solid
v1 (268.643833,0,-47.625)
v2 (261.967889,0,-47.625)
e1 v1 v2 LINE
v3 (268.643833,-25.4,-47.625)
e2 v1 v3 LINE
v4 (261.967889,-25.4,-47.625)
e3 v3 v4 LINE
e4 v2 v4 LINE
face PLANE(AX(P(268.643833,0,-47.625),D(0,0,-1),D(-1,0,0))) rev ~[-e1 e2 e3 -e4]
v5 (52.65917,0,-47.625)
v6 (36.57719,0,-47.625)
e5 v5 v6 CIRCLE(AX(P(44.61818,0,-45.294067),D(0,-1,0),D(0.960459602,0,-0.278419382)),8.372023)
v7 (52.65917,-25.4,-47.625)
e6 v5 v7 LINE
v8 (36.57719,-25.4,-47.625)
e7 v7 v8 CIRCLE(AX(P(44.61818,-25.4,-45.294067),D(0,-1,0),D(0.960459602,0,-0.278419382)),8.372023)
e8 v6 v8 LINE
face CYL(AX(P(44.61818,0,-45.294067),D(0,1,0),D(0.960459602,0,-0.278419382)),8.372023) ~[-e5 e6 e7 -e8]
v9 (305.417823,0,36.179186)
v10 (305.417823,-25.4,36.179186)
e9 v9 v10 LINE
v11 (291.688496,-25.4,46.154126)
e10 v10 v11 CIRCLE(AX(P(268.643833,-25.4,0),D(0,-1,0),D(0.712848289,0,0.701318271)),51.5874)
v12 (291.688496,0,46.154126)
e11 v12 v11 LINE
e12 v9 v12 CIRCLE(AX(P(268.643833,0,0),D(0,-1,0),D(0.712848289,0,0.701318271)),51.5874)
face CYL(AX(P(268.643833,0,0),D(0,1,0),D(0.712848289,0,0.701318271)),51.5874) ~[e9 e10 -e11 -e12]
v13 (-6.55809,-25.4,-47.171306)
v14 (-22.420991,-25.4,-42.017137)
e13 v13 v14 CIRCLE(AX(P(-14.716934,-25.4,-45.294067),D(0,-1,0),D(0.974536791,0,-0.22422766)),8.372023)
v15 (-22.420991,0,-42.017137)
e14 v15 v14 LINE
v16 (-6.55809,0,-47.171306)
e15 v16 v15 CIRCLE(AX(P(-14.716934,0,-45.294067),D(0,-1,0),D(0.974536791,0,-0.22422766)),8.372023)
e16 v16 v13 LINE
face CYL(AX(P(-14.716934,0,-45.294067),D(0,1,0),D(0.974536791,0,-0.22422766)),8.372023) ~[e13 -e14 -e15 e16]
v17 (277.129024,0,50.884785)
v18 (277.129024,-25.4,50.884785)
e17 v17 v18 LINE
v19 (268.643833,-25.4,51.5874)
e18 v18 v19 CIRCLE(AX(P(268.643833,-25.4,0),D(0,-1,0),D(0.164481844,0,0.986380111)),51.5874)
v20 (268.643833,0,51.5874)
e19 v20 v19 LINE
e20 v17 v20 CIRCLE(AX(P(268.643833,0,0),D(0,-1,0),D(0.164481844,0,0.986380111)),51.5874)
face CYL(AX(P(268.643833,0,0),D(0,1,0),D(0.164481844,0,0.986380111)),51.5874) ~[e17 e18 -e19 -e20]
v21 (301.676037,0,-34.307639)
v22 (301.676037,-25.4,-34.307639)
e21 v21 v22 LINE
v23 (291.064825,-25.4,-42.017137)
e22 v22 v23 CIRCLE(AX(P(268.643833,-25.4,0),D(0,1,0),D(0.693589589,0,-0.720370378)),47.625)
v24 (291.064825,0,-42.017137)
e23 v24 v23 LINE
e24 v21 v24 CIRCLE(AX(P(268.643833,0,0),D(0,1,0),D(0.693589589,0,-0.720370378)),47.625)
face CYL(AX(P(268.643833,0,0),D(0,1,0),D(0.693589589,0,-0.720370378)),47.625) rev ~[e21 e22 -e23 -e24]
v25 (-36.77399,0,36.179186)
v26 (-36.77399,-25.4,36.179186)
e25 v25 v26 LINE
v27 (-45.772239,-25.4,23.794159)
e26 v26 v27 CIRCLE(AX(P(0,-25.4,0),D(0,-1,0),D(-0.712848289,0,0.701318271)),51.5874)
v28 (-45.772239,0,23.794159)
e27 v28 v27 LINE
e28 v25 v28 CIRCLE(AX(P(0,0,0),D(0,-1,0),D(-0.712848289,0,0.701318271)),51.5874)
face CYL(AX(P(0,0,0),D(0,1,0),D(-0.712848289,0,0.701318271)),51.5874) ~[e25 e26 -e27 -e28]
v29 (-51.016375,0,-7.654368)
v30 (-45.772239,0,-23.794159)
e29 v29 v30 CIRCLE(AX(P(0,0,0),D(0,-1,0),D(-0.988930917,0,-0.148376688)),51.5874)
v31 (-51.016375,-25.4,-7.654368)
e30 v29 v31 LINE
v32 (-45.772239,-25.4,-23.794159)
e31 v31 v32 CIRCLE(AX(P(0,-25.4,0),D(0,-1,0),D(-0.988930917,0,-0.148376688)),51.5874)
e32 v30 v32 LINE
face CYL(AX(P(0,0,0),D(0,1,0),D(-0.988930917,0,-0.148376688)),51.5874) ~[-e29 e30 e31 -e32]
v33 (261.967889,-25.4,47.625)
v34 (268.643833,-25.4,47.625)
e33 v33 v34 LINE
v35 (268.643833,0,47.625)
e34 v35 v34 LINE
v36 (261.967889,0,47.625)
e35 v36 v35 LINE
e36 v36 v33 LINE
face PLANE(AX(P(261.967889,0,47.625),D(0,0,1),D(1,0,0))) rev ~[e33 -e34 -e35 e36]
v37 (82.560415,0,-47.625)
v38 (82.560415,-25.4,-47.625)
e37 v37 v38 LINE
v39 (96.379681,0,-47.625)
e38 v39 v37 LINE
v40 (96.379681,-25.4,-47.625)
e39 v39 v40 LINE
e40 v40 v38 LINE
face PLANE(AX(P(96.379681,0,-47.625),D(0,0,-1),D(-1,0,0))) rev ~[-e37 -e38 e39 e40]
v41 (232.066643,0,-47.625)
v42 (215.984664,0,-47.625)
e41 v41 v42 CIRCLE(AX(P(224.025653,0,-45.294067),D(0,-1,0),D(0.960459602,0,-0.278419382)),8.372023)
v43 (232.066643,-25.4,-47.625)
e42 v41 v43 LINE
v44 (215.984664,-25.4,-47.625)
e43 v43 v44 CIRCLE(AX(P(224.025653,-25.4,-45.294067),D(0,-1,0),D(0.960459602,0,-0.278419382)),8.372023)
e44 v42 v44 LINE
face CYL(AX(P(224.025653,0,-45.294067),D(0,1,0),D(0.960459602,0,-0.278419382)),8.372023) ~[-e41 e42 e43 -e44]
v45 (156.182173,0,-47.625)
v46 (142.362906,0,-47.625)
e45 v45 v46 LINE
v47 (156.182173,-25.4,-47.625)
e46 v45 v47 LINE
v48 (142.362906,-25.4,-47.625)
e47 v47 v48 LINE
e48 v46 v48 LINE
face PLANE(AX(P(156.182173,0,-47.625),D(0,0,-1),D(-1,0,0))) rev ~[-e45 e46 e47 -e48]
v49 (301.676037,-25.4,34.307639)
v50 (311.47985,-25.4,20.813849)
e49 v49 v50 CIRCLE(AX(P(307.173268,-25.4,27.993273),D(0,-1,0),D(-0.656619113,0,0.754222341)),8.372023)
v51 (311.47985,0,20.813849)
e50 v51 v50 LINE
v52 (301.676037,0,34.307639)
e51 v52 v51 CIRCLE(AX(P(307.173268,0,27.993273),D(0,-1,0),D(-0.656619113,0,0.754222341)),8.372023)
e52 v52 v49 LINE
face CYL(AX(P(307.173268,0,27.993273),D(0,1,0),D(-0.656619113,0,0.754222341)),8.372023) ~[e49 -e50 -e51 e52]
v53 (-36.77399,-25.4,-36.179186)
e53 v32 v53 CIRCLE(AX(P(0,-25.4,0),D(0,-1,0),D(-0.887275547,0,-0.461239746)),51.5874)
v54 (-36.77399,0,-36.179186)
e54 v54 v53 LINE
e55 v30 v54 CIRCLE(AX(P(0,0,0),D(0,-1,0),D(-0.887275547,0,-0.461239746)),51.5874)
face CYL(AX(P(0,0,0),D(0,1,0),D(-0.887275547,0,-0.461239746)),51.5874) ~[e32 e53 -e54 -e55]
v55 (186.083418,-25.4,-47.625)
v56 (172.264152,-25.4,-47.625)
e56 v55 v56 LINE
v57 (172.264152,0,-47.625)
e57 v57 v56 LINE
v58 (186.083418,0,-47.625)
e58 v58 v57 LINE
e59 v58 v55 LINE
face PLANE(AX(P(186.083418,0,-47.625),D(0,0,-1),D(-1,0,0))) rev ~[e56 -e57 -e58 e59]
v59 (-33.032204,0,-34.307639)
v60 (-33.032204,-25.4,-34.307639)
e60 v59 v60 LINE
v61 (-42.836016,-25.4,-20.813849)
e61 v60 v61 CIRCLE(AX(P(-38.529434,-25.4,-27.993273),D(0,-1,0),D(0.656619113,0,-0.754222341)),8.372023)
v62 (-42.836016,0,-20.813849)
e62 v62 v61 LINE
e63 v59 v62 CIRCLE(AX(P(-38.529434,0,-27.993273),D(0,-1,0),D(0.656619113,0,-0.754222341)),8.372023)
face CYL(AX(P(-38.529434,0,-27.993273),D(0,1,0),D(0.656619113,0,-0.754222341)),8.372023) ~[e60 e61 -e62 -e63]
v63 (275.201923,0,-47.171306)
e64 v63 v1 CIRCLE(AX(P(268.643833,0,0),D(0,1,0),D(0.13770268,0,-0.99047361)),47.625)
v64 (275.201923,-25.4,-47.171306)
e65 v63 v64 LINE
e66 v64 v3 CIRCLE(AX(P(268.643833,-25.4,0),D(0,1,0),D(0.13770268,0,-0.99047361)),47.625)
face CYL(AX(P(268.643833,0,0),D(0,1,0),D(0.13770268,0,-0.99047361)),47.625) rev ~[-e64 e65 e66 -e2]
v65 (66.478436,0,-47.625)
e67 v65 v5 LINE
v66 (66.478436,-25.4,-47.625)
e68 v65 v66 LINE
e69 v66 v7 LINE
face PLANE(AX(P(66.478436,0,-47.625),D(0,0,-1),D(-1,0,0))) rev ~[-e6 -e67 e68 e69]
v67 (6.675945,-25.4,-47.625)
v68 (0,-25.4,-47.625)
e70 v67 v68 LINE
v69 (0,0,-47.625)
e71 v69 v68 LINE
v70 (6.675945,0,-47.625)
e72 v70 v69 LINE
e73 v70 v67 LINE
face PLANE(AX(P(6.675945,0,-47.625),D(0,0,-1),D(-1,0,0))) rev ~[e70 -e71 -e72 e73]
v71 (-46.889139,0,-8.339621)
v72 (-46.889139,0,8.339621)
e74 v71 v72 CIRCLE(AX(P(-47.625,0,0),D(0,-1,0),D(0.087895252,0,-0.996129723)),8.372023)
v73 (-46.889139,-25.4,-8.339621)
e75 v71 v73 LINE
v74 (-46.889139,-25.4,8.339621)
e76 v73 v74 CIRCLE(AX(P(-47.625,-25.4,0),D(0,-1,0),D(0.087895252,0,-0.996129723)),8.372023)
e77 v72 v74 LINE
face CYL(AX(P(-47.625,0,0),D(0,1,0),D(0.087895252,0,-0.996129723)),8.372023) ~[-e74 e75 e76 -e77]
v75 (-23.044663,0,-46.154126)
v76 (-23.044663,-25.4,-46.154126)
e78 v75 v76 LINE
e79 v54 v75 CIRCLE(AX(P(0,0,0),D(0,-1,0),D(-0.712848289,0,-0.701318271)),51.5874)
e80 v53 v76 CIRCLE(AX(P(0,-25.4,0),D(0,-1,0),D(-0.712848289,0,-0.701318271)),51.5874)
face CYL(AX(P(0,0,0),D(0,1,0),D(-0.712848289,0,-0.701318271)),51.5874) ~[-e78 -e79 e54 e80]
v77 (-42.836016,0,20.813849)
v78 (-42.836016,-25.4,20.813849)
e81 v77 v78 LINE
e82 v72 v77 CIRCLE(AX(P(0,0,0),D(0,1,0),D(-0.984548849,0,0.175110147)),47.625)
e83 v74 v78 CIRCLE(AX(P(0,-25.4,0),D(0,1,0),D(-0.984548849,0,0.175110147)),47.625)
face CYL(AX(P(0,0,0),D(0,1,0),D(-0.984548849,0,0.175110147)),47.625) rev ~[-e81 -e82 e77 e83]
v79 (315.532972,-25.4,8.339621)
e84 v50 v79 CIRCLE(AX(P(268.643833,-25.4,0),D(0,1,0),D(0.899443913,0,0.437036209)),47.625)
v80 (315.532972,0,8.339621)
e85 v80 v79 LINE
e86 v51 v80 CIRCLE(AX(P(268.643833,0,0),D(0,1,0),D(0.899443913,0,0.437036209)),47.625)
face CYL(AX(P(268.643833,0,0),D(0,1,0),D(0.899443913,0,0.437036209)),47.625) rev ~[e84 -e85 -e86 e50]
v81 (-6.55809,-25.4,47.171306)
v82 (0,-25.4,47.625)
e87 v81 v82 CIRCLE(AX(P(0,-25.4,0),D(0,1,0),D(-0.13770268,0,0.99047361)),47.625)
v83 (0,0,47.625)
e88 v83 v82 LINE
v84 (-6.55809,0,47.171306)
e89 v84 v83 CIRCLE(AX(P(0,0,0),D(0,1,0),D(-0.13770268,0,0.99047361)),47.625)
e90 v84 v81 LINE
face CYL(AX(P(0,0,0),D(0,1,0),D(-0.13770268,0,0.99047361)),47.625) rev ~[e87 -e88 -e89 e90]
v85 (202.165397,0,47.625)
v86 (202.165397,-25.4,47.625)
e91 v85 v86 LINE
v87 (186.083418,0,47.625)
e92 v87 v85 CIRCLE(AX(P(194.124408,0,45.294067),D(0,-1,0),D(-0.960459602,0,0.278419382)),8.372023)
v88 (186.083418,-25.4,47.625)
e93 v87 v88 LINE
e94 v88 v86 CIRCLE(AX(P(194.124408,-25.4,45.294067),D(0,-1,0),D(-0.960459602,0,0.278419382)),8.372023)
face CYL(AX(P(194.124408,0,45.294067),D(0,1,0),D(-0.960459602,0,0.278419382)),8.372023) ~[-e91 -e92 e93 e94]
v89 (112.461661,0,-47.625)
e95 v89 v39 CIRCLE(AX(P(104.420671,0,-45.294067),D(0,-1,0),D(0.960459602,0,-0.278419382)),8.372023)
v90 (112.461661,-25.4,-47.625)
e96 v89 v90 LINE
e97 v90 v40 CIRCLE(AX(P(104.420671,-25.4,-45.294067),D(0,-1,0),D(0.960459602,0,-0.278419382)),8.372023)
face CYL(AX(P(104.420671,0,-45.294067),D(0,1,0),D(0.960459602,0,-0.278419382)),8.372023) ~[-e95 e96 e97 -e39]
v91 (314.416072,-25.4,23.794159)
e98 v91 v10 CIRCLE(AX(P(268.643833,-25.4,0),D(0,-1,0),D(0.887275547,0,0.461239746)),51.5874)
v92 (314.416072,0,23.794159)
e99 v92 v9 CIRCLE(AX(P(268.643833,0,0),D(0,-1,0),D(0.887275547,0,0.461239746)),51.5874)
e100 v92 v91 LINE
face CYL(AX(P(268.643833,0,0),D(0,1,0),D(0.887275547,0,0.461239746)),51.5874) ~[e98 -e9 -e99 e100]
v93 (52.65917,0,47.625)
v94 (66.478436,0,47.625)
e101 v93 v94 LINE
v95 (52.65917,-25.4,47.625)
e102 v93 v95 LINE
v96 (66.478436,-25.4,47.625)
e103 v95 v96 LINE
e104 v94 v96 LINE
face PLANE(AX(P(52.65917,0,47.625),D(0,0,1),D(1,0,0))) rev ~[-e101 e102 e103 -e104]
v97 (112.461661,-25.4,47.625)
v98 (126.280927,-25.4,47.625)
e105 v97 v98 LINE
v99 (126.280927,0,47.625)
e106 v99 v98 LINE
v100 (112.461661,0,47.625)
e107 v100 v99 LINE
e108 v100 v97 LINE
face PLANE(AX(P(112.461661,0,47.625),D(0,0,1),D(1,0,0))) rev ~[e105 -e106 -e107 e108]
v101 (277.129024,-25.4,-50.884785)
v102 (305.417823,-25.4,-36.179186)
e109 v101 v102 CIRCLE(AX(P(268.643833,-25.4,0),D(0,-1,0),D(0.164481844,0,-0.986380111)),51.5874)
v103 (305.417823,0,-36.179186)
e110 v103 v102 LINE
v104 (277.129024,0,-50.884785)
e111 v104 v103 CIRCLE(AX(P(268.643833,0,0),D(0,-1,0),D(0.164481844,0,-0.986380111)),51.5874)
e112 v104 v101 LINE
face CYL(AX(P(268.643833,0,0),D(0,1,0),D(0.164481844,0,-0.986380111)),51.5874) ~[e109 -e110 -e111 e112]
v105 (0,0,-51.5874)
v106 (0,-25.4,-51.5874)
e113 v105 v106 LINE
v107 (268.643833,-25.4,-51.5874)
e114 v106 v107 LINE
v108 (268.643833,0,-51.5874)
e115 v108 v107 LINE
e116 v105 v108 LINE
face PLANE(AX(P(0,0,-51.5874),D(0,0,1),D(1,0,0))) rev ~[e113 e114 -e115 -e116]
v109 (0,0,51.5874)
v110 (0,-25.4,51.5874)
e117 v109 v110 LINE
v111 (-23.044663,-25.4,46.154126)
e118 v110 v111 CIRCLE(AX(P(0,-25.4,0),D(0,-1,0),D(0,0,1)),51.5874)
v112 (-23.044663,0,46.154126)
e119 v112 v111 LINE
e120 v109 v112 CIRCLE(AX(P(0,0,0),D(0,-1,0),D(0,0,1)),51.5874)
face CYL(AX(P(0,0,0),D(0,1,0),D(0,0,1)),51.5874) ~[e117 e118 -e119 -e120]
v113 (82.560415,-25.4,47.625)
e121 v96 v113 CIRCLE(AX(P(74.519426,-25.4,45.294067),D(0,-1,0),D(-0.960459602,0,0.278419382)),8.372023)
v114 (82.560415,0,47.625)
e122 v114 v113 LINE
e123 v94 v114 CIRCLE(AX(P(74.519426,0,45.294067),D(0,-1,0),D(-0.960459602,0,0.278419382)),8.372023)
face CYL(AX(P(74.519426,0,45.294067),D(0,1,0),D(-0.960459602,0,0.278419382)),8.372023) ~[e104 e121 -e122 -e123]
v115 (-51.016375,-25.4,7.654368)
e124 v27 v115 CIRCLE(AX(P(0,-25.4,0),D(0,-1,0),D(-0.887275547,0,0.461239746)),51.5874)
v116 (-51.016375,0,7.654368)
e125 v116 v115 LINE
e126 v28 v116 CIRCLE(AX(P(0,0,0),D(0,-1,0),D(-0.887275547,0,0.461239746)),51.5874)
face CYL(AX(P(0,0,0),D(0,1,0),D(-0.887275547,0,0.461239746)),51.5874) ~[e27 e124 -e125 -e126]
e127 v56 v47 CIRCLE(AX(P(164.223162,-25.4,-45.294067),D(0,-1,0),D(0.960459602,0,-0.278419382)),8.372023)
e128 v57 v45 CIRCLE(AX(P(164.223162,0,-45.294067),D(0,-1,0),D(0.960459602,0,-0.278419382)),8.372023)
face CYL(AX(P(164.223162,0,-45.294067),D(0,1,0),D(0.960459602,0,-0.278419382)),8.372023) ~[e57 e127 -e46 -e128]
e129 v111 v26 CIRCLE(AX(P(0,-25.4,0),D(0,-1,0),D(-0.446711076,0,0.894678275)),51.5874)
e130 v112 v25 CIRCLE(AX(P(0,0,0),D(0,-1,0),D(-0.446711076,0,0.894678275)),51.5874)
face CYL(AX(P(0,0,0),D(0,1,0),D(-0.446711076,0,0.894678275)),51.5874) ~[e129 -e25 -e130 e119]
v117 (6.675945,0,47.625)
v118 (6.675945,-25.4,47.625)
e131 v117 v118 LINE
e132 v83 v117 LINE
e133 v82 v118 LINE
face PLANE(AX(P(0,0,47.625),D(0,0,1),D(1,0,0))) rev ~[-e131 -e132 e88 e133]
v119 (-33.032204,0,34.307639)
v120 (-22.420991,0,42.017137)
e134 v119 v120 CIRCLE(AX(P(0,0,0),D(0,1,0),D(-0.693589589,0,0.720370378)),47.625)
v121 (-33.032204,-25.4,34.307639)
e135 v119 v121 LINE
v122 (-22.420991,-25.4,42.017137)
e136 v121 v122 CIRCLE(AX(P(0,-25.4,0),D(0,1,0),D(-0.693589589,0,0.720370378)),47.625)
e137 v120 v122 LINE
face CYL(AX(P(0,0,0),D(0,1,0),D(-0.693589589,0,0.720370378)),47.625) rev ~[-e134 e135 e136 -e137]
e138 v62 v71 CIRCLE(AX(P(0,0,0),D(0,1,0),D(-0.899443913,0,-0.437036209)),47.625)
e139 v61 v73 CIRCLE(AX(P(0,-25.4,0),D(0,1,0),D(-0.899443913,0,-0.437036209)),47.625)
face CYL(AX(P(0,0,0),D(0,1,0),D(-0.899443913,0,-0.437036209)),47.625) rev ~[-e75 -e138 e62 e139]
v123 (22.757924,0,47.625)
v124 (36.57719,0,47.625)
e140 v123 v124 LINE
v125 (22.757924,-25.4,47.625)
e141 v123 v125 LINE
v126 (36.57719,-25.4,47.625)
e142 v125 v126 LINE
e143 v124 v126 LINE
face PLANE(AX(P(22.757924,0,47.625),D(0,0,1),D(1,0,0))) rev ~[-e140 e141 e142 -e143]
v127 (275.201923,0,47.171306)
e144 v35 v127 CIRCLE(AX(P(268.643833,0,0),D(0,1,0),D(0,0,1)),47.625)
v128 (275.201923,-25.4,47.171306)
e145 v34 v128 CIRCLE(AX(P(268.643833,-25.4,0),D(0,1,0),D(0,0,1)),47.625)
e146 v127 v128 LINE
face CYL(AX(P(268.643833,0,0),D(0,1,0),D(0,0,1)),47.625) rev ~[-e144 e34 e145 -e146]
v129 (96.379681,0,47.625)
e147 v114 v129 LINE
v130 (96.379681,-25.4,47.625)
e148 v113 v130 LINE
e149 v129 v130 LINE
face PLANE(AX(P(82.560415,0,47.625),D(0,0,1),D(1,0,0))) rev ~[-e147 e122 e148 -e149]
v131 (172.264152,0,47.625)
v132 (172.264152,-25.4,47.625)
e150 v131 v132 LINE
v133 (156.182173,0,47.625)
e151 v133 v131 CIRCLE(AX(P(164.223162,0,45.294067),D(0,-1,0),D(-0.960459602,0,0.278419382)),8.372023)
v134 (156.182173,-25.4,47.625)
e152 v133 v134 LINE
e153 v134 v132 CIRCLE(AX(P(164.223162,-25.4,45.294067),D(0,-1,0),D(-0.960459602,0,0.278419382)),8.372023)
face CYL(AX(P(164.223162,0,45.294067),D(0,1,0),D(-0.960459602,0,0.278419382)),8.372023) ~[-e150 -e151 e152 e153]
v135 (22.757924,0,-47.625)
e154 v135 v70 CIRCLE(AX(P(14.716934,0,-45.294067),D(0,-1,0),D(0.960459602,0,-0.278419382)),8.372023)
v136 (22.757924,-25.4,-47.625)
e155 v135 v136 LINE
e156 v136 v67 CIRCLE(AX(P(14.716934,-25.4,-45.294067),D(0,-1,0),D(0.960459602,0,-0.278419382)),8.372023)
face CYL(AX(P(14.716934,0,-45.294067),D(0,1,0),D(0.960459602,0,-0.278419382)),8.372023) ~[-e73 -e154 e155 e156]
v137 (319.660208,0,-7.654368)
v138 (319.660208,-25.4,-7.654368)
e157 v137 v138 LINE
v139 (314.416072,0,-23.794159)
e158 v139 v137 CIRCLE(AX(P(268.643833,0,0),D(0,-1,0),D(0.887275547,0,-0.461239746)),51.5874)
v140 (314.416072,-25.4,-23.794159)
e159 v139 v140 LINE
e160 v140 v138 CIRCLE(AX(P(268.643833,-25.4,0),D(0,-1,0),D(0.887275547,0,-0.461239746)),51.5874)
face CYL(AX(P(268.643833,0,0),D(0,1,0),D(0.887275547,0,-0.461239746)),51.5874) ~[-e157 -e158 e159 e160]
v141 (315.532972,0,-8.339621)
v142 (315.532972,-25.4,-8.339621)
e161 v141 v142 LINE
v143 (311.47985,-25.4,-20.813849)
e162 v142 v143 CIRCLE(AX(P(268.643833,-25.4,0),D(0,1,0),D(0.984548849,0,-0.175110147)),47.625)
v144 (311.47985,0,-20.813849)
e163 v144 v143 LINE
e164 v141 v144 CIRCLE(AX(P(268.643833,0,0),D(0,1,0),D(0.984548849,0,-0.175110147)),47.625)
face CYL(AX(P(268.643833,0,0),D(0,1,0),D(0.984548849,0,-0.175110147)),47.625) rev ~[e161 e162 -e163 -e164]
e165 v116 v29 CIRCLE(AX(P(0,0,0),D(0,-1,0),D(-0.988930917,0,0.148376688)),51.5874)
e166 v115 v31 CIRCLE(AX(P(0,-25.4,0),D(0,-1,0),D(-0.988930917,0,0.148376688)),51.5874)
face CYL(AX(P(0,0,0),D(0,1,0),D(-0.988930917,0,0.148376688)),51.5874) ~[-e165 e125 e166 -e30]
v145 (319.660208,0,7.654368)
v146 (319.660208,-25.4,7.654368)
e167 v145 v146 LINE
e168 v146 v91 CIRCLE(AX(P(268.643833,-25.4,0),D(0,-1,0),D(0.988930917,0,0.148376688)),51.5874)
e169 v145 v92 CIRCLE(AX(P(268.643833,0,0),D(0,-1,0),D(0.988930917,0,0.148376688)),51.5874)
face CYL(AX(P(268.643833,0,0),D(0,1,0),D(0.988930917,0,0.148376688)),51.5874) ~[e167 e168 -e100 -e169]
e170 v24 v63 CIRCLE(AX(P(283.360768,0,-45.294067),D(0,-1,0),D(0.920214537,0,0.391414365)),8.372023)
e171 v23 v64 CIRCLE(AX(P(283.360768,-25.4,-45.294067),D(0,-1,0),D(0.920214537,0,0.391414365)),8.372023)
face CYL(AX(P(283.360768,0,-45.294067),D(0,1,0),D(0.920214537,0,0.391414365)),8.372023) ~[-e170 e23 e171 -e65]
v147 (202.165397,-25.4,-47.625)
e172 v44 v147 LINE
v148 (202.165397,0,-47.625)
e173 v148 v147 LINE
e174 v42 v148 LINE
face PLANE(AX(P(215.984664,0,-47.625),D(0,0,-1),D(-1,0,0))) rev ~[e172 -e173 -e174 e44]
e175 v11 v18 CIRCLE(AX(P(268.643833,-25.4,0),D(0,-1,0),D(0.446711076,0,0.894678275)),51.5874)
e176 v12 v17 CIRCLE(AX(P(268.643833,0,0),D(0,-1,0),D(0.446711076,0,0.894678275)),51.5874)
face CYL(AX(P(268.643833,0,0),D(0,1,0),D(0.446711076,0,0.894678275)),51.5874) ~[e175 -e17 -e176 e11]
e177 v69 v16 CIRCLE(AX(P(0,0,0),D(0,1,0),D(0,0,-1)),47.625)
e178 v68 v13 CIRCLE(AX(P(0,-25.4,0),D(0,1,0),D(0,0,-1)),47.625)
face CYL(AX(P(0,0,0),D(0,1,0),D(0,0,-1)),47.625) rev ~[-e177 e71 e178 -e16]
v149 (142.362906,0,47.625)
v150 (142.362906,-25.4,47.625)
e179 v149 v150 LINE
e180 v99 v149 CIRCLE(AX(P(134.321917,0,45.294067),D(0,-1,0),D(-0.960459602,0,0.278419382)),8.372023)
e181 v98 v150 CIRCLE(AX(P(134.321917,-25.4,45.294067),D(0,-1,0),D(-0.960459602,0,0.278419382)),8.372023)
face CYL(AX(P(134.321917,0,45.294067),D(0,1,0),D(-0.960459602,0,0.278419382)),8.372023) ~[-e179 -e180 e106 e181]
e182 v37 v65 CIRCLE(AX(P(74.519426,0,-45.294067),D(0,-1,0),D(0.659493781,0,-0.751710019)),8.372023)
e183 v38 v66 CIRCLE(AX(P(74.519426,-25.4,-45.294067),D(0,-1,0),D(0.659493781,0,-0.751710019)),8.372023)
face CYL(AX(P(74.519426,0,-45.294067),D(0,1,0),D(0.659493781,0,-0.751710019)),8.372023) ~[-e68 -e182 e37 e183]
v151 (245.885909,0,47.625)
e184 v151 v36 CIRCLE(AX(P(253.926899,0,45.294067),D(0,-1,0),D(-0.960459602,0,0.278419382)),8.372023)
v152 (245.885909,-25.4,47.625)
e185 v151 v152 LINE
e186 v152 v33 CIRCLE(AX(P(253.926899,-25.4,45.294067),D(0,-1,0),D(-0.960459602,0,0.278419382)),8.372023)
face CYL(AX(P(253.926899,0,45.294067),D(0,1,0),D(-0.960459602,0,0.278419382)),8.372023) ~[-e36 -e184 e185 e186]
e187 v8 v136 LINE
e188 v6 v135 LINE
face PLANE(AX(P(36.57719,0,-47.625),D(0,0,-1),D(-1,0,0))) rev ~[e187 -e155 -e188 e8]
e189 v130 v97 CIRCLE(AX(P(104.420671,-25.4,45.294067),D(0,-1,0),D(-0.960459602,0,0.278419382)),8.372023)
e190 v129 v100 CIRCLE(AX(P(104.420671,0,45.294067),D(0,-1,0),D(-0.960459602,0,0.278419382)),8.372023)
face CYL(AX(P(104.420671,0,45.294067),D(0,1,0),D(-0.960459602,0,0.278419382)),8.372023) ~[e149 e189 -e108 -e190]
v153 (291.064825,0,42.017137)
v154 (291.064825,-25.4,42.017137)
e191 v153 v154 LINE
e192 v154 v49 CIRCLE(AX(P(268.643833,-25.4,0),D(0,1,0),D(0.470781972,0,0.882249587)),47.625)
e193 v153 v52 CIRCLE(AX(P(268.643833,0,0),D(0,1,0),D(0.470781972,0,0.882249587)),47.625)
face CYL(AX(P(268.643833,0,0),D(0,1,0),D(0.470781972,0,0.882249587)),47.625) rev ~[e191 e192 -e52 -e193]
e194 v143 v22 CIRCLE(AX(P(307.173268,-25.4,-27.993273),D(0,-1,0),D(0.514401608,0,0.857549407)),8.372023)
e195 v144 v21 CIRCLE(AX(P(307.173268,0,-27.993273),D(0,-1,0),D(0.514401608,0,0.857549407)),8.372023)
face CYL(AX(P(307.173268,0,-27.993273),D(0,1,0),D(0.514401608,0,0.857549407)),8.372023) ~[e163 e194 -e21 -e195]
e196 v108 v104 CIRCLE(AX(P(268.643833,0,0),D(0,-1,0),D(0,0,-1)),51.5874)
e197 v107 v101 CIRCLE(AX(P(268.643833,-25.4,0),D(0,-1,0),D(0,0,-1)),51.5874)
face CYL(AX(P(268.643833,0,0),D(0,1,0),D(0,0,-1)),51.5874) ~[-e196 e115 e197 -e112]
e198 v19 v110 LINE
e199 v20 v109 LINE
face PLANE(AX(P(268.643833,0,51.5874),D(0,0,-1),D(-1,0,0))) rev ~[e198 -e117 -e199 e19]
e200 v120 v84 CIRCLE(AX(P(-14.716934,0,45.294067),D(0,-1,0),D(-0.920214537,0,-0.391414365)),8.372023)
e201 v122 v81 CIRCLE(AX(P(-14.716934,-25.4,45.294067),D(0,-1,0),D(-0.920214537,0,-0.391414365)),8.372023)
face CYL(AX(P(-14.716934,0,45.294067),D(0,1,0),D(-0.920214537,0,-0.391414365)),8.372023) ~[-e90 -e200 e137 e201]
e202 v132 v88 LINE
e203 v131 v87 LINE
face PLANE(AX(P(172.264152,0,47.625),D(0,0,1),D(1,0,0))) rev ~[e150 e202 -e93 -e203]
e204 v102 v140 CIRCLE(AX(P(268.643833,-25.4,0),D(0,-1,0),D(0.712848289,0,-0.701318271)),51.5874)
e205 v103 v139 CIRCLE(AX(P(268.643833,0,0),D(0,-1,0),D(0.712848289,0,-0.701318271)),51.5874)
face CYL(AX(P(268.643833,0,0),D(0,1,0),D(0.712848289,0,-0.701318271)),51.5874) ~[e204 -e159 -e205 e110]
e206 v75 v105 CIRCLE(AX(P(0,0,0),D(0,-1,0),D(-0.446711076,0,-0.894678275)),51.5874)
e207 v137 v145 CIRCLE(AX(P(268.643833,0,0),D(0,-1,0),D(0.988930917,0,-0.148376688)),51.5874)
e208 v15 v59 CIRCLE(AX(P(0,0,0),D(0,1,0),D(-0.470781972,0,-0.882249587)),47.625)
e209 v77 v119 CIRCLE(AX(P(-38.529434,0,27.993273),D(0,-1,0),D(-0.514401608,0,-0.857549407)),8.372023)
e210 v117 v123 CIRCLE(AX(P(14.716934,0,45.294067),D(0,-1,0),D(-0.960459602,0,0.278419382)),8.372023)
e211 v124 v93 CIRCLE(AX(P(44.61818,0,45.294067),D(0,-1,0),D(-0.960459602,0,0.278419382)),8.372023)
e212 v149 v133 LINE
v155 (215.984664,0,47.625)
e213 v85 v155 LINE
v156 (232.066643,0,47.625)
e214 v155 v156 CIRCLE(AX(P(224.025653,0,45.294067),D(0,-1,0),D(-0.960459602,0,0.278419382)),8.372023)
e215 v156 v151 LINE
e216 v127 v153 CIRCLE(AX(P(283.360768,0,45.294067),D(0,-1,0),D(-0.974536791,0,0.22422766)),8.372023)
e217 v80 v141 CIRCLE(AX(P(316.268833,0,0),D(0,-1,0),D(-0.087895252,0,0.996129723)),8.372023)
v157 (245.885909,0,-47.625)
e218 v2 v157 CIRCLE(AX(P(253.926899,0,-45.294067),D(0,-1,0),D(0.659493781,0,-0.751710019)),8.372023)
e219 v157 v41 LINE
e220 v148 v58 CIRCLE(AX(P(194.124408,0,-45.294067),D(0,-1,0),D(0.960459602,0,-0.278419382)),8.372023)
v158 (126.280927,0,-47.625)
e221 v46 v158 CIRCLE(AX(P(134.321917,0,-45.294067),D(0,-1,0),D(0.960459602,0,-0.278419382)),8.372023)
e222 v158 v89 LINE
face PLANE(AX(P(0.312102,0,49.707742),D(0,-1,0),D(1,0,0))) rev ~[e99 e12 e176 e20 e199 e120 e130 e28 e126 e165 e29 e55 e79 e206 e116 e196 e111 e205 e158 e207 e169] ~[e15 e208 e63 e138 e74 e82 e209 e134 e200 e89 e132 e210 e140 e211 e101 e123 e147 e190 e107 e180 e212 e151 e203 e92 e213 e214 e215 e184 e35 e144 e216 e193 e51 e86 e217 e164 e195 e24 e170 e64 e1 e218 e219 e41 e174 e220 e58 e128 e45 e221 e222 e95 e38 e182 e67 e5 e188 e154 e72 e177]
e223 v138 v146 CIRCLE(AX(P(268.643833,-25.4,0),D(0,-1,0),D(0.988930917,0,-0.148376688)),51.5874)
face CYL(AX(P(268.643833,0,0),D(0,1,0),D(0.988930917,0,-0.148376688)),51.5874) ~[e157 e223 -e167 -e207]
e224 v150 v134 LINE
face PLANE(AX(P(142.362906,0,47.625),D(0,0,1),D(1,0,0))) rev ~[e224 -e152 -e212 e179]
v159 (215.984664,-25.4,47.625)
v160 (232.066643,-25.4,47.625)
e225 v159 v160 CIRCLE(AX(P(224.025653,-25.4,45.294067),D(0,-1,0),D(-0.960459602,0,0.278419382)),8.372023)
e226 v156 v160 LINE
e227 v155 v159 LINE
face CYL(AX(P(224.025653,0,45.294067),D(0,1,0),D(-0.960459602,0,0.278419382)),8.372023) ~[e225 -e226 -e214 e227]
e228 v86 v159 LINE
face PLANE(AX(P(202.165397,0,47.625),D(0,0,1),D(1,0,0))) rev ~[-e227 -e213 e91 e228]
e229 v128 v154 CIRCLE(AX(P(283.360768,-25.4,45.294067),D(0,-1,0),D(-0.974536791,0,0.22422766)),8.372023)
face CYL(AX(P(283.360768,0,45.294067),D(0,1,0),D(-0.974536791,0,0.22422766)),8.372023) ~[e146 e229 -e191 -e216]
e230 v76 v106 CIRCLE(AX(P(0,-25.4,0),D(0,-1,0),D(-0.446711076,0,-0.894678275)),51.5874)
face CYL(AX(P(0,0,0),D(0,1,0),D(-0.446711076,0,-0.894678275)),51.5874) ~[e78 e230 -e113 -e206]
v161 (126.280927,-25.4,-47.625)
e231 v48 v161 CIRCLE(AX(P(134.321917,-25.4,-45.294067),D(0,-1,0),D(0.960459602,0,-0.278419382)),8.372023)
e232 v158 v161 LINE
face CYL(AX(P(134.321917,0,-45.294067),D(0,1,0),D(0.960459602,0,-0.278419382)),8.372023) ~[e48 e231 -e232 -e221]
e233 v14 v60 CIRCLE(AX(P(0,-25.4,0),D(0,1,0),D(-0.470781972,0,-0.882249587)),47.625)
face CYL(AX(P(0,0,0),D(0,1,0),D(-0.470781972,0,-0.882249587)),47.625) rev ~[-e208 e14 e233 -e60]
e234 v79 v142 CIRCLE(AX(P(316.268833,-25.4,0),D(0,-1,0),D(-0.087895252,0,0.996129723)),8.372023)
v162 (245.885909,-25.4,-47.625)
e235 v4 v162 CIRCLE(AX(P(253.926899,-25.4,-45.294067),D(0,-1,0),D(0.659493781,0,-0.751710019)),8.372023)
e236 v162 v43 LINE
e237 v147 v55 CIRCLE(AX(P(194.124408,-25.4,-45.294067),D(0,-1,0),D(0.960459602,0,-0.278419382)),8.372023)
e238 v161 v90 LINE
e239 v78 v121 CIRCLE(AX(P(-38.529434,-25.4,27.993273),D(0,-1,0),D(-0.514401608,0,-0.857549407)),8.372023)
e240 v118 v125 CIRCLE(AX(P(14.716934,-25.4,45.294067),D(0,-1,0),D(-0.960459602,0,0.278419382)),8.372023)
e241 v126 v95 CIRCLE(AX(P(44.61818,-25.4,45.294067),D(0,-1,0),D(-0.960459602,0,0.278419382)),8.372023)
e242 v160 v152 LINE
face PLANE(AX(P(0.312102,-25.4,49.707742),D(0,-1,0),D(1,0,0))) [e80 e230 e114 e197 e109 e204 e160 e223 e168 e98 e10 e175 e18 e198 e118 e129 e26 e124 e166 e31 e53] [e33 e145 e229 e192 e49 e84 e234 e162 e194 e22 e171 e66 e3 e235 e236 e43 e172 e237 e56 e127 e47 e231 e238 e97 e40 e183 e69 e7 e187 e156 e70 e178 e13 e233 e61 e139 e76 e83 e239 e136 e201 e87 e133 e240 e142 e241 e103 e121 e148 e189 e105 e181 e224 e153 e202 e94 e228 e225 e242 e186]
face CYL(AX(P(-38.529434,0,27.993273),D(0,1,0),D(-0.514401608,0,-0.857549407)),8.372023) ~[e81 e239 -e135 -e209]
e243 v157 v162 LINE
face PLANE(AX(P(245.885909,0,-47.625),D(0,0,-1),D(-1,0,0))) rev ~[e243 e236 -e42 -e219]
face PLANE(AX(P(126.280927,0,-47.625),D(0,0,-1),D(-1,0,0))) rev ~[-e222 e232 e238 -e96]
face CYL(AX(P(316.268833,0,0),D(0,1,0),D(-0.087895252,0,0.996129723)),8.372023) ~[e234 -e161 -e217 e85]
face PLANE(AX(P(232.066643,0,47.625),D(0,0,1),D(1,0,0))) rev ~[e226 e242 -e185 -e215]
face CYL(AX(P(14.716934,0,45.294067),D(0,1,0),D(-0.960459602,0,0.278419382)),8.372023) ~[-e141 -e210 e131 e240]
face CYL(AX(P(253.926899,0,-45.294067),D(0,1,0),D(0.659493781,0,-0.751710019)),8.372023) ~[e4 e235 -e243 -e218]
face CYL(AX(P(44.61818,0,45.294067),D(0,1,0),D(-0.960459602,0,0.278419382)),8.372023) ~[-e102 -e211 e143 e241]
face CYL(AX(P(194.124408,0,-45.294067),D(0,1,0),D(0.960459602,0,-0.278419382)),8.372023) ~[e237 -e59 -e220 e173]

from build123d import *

# Parameters (mm, degrees)
F3_DEPTH = 25.4


with BuildPart() as f3:
    # F2 (on Front) → F3 (new body)
    with BuildSketch(Plane.XZ):
        with BuildLine():
            ThreePointArc((-6.5580901404, 47.171305671), (-3.2868824452, 47.5114410305), (0, 47.625))
            Line((0, 47.625), (6.6759446819, 47.625))
            ThreePointArc((6.6759446819, 47.625), (7.6523000339, 49.786472114), (9.1956373991, 51.5874))
            Line((9.1956373991, 51.5874), (0, 51.5874))
            ThreePointArc((0, 51.5874), (-4.2571154541, 51.4114462622), (-8.485190663, 50.8847853309))
            ThreePointArc((-8.485190663, 50.8847853309), (-7.2859359113, 49.1503637276), (-6.5580901404, 47.171305671))
        make_face()
        with BuildLine():
            ThreePointArc((-22.4209914306, 42.0171366024), (-12.129837039, 37.3317997636), (-6.5580901404, 47.171305671))
            ThreePointArc((-6.5580901404, 47.171305671), (-14.7169343571, 45.2940665886), (-22.4209914306, 42.0171366024))
        make_face()
        with BuildLine():
            ThreePointArc((-22.4209914306, 42.0171366024), (-14.7169343571, 45.2940665886), (-6.5580901404, 47.171305671))
            ThreePointArc((-6.5580901404, 47.171305671), (-7.2859359113, 49.1503637276), (-8.485190663, 50.8847853309))
            ThreePointArc((-8.485190663, 50.8847853309), (-15.9413832956, 49.0625329287), (-23.0446629367, 46.1541260224))
            ThreePointArc((-23.0446629367, 46.1541260224), (-22.9954129717, 44.0460452131), (-22.4209914306, 42.0171366024))
        make_face()
        with BuildLine():
            ThreePointArc((9.1956373991, 51.5874), (7.6523000339, 49.786472114), (6.6759446819, 47.625))
            Line((6.6759446819, 47.625), (22.7579240323, 47.625))
            ThreePointArc((22.7579240323, 47.625), (21.7815686803, 49.786472114), (20.2382313151, 51.5874))
            Line((20.2382313151, 51.5874), (9.1956373991, 51.5874))
        make_face()
        with BuildLine():
            Line((22.7579240323, 47.625), (6.6759446819, 47.625))
            ThreePointArc((6.6759446819, 47.625), (14.7169343571, 36.9220438028), (22.7579240323, 47.625))
        make_face()
        with BuildLine():
            ThreePointArc((-33.032204179, 34.307639267), (-27.9932726404, 38.5294343571), (-22.4209914306, 42.0171366024))
            ThreePointArc((-22.4209914306, 42.0171366024), (-22.9954129717, 44.0460452131), (-23.0446629367, 46.1541260224))
            ThreePointArc((-23.0446629367, 46.1541260224), (-30.3223129241, 41.7350832956), (-36.7739898304, 36.1791861533))
            ThreePointArc((-36.7739898304, 36.1791861533), (-34.7843049161, 35.4809138575), (-33.032204179, 34.307639267))
        make_face()
        with BuildLine():
            ThreePointArc((20.2382313151, 51.5874), (21.7815686803, 49.786472114), (22.7579240323, 47.625))
            Line((22.7579240323, 47.625), (36.5771902535, 47.625))
            ThreePointArc((36.5771902535, 47.625), (37.5535456055, 49.786472114), (39.0968829707, 51.5874))
            Line((39.0968829707, 51.5874), (20.2382313151, 51.5874))
        make_face()
        with BuildLine():
            ThreePointArc((-42.8360163366, 20.8138494617), (-31.7563256461, 23.0723211151), (-33.032204179, 34.307639267))
            ThreePointArc((-33.032204179, 34.307639267), (-38.5294343571, 27.9932726404), (-42.8360163366, 20.8138494617))
        make_face()
        with BuildLine():
            ThreePointArc((-42.8360163366, 20.8138494617), (-38.5294343571, 27.9932726404), (-33.032204179, 34.307639267))
            ThreePointArc((-33.032204179, 34.307639267), (-34.7843049161, 35.4809138575), (-36.7739898304, 36.1791861533))
            ThreePointArc((-36.7739898304, 36.1791861533), (-41.7350832956, 30.3223129241), (-45.7722385539, 23.7941592944))
            ThreePointArc((-45.7722385539, 23.7941592944), (-44.4932956849, 22.1176344973), (-42.8360163366, 20.8138494617))
        make_face()
        with BuildLine():
            ThreePointArc((39.0968829707, 51.5874), (37.5535456055, 49.786472114), (36.5771902535, 47.625))
            Line((36.5771902535, 47.625), (52.6591696039, 47.625))
            ThreePointArc((52.6591696039, 47.625), (51.6828142519, 49.786472114), (50.1394768867, 51.5874))
            Line((50.1394768867, 51.5874), (39.0968829707, 51.5874))
        make_face()
        with BuildLine():
            Line((52.6591696039, 47.625), (36.5771902535, 47.625))
            ThreePointArc((36.5771902535, 47.625), (44.6181799287, 36.9220438028), (52.6591696039, 47.625))
        make_face()
        with BuildLine():
            ThreePointArc((-46.8891389446, 8.3396207368), (-45.2940665886, 14.7169343571), (-42.8360163366, 20.8138494617))
            ThreePointArc((-42.8360163366, 20.8138494617), (-44.4932956849, 22.1176344973), (-45.7722385539, 23.7941592944))
            ThreePointArc((-45.7722385539, 23.7941592944), (-49.0625329287, 15.9413832956), (-51.0163747846, 7.6543675504))
            ThreePointArc((-51.0163747846, 7.6543675504), (-48.9962517179, 8.2589608458), (-46.8891389446, 8.3396207368))
        make_face()
        with BuildLine():
            ThreePointArc((50.1394768867, 51.5874), (51.6828142519, 49.786472114), (52.6591696039, 47.625))
            Line((52.6591696039, 47.625), (66.478435825, 47.625))
            ThreePointArc((66.478435825, 47.625), (67.4547911771, 49.786472114), (68.9981285423, 51.5874))
            Line((68.9981285423, 51.5874), (50.1394768867, 51.5874))
        make_face()
        with BuildLine():
            ThreePointArc((-46.8891389446, -8.3396207368), (-39.2529772142, 0), (-46.8891389446, 8.3396207368))
            ThreePointArc((-46.8891389446, 8.3396207368), (-47.625, 0), (-46.8891389446, -8.3396207368))
        make_face()
        with BuildLine():
            ThreePointArc((-46.8891389446, -8.3396207368), (-47.625, 0), (-46.8891389446, 8.3396207368))
            ThreePointArc((-46.8891389446, 8.3396207368), (-48.9962517179, 8.2589608458), (-51.0163747846, 7.6543675504))
            ThreePointArc((-51.0163747846, 7.6543675504), (-51.5874, 0), (-51.0163747846, -7.6543675504))
            ThreePointArc((-51.0163747846, -7.6543675504), (-48.9962517179, -8.2589608458), (-46.8891389446, -8.3396207368))
        make_face()
        with BuildLine():
            ThreePointArc((68.9981285423, 51.5874), (67.4547911771, 49.786472114), (66.478435825, 47.625))
            Line((66.478435825, 47.625), (82.5604151755, 47.625))
            ThreePointArc((82.5604151755, 47.625), (81.5840598235, 49.786472114), (80.0407224583, 51.5874))
            Line((80.0407224583, 51.5874), (68.9981285423, 51.5874))
        make_face()
        with BuildLine():
            Line((82.5604151755, 47.625), (66.478435825, 47.625))
            ThreePointArc((66.478435825, 47.625), (74.5194255003, 36.9220438028), (82.5604151755, 47.625))
        make_face()
        with BuildLine():
            ThreePointArc((-42.8360163366, -20.8138494617), (-45.2940665886, -14.7169343571), (-46.8891389446, -8.3396207368))
            ThreePointArc((-46.8891389446, -8.3396207368), (-48.9962517179, -8.2589608458), (-51.0163747846, -7.6543675504))
            ThreePointArc((-51.0163747846, -7.6543675504), (-49.0625329287, -15.9413832956), (-45.7722385539, -23.7941592944))
            ThreePointArc((-45.7722385539, -23.7941592944), (-44.4932956849, -22.1176344973), (-42.8360163366, -20.8138494617))
        make_face()
        with BuildLine():
            ThreePointArc((80.0407224583, 51.5874), (81.5840598235, 49.786472114), (82.5604151755, 47.625))
            Line((82.5604151755, 47.625), (96.3796813966, 47.625))
            ThreePointArc((96.3796813966, 47.625), (97.3560367487, 49.786472114), (98.8993741139, 51.5874))
            Line((98.8993741139, 51.5874), (80.0407224583, 51.5874))
        make_face()
        with BuildLine():
            ThreePointArc((-33.032204179, -34.307639267), (-31.7563256461, -23.0723211151), (-42.8360163366, -20.8138494617))
            ThreePointArc((-42.8360163366, -20.8138494617), (-38.5294343571, -27.9932726404), (-33.032204179, -34.307639267))
        make_face()
        with BuildLine():
            ThreePointArc((-33.032204179, -34.307639267), (-38.5294343571, -27.9932726404), (-42.8360163366, -20.8138494617))
            ThreePointArc((-42.8360163366, -20.8138494617), (-44.4932956849, -22.1176344973), (-45.7722385539, -23.7941592944))
            ThreePointArc((-45.7722385539, -23.7941592944), (-41.7350832956, -30.3223129241), (-36.7739898304, -36.1791861533))
            ThreePointArc((-36.7739898304, -36.1791861533), (-34.7843049161, -35.4809138575), (-33.032204179, -34.307639267))
        make_face()
        with BuildLine():
            ThreePointArc((98.8993741139, 51.5874), (97.3560367487, 49.786472114), (96.3796813966, 47.625))
            Line((96.3796813966, 47.625), (112.4616607471, 47.625))
            Line((112.4616607471, 47.625), (126.2809269682, 47.625))
            ThreePointArc((126.2809269682, 47.625), (127.2572823202, 49.786472114), (128.8006196855, 51.5874))
            Line((128.8006196855, 51.5874), (98.8993741139, 51.5874))
        make_face()
        with BuildLine():
            Line((112.4616607471, 47.625), (96.3796813966, 47.625))
            ThreePointArc((96.3796813966, 47.625), (104.4206710719, 36.9220438028), (112.4616607471, 47.625))
        make_face()
        with BuildLine():
            ThreePointArc((-22.4209914306, -42.0171366024), (-27.9932726404, -38.5294343571), (-33.032204179, -34.307639267))
            ThreePointArc((-33.032204179, -34.307639267), (-34.7843049161, -35.4809138575), (-36.7739898304, -36.1791861533))
            ThreePointArc((-36.7739898304, -36.1791861533), (-30.3223129241, -41.7350832956), (-23.0446629367, -46.1541260224))
            ThreePointArc((-23.0446629367, -46.1541260224), (-22.9954129717, -44.0460452131), (-22.4209914306, -42.0171366024))
        make_face()
        with BuildLine():
            ThreePointArc((-6.5580901404, -47.171305671), (-12.129837039, -37.3317997636), (-22.4209914306, -42.0171366024))
            ThreePointArc((-22.4209914306, -42.0171366024), (-14.7169343571, -45.2940665886), (-6.5580901404, -47.171305671))
        make_face()
        with BuildLine():
            ThreePointArc((-6.5580901404, -47.171305671), (-14.7169343571, -45.2940665886), (-22.4209914306, -42.0171366024))
            ThreePointArc((-22.4209914306, -42.0171366024), (-22.9954129717, -44.0460452131), (-23.0446629367, -46.1541260224))
            ThreePointArc((-23.0446629367, -46.1541260224), (-15.9413832956, -49.0625329287), (-8.485190663, -50.8847853309))
            ThreePointArc((-8.485190663, -50.8847853309), (-7.2859359113, -49.1503637276), (-6.5580901404, -47.171305671))
        make_face()
        with BuildLine():
            ThreePointArc((128.8006196855, 51.5874), (127.2572823202, 49.786472114), (126.2809269682, 47.625))
            Line((126.2809269682, 47.625), (142.3629063187, 47.625))
            ThreePointArc((142.3629063187, 47.625), (141.3865509666, 49.786472114), (139.8432136014, 51.5874))
            Line((139.8432136014, 51.5874), (128.8006196855, 51.5874))
        make_face()
        with BuildLine():
            Line((142.3629063187, 47.625), (126.2809269682, 47.625))
            ThreePointArc((126.2809269682, 47.625), (134.3219166434, 36.9220438028), (142.3629063187, 47.625))
        make_face()
        with BuildLine():
            ThreePointArc((0, -47.625), (-3.2868824452, -47.5114410305), (-6.5580901404, -47.171305671))
            ThreePointArc((-6.5580901404, -47.171305671), (-7.2859359113, -49.1503637276), (-8.485190663, -50.8847853309))
            ThreePointArc((-8.485190663, -50.8847853309), (-4.2571154541, -51.4114462622), (0, -51.5874))
            Line((0, -51.5874), (9.1956373991, -51.5874))
            ThreePointArc((9.1956373991, -51.5874), (7.6523000339, -49.786472114), (6.6759446819, -47.625))
            Line((6.6759446819, -47.625), (0, -47.625))
        make_face()
        with BuildLine():
            ThreePointArc((139.8432136014, 51.5874), (141.3865509666, 49.786472114), (142.3629063187, 47.625))
            Line((142.3629063187, 47.625), (156.1821725398, 47.625))
            ThreePointArc((156.1821725398, 47.625), (157.1585278918, 49.786472114), (158.701865257, 51.5874))
            Line((158.701865257, 51.5874), (139.8432136014, 51.5874))
        make_face()
        with BuildLine():
            ThreePointArc((158.701865257, 51.5874), (157.1585278918, 49.786472114), (156.1821725398, 47.625))
            Line((156.1821725398, 47.625), (172.2641518903, 47.625))
            ThreePointArc((172.2641518903, 47.625), (171.2877965382, 49.786472114), (169.744459173, 51.5874))
            Line((169.744459173, 51.5874), (158.701865257, 51.5874))
        make_face()
        with BuildLine():
            Line((172.2641518903, 47.625), (156.1821725398, 47.625))
            ThreePointArc((156.1821725398, 47.625), (164.223162215, 36.9220438028), (172.2641518903, 47.625))
        make_face()
        with BuildLine():
            ThreePointArc((22.7579240323, -47.625), (14.7169343571, -36.9220438028), (6.6759446819, -47.625))
            Line((6.6759446819, -47.625), (22.7579240323, -47.625))
        make_face()
        with BuildLine():
            Line((22.7579240323, -47.625), (6.6759446819, -47.625))
            ThreePointArc((6.6759446819, -47.625), (7.6523000339, -49.786472114), (9.1956373991, -51.5874))
            Line((9.1956373991, -51.5874), (20.2382313151, -51.5874))
            ThreePointArc((20.2382313151, -51.5874), (21.7815686803, -49.786472114), (22.7579240323, -47.625))
        make_face()
        with BuildLine():
            ThreePointArc((169.744459173, 51.5874), (171.2877965382, 49.786472114), (172.2641518903, 47.625))
            Line((172.2641518903, 47.625), (186.0834181114, 47.625))
            ThreePointArc((186.0834181114, 47.625), (187.0597734634, 49.786472114), (188.6031108286, 51.5874))
            Line((188.6031108286, 51.5874), (169.744459173, 51.5874))
        make_face()
        with BuildLine():
            Line((36.5771902535, -47.625), (22.7579240323, -47.625))
            ThreePointArc((22.7579240323, -47.625), (21.7815686803, -49.786472114), (20.2382313151, -51.5874))
            Line((20.2382313151, -51.5874), (39.0968829707, -51.5874))
            ThreePointArc((39.0968829707, -51.5874), (37.5535456055, -49.786472114), (36.5771902535, -47.625))
        make_face()
        with BuildLine():
            ThreePointArc((188.6031108286, 51.5874), (187.0597734634, 49.786472114), (186.0834181114, 47.625))
            Line((186.0834181114, 47.625), (202.1653974618, 47.625))
            ThreePointArc((202.1653974618, 47.625), (201.1890421098, 49.786472114), (199.6457047446, 51.5874))
            Line((199.6457047446, 51.5874), (188.6031108286, 51.5874))
        make_face()
        with BuildLine():
            Line((202.1653974618, 47.625), (186.0834181114, 47.625))
            ThreePointArc((186.0834181114, 47.625), (194.1244077866, 36.9220438028), (202.1653974618, 47.625))
        make_face()
        with BuildLine():
            ThreePointArc((52.6591696039, -47.625), (44.6181799287, -36.9220438028), (36.5771902535, -47.625))
            Line((36.5771902535, -47.625), (52.6591696039, -47.625))
        make_face()
        with BuildLine():
            Line((52.6591696039, -47.625), (36.5771902535, -47.625))
            ThreePointArc((36.5771902535, -47.625), (37.5535456055, -49.786472114), (39.0968829707, -51.5874))
            Line((39.0968829707, -51.5874), (50.1394768867, -51.5874))
            ThreePointArc((50.1394768867, -51.5874), (51.6828142519, -49.786472114), (52.6591696039, -47.625))
        make_face()
        with BuildLine():
            ThreePointArc((199.6457047446, 51.5874), (201.1890421098, 49.786472114), (202.1653974618, 47.625))
            Line((202.1653974618, 47.625), (215.984663683, 47.625))
            ThreePointArc((215.984663683, 47.625), (216.961019035, 49.786472114), (218.5043564002, 51.5874))
            Line((218.5043564002, 51.5874), (199.6457047446, 51.5874))
        make_face()
        with BuildLine():
            Line((66.478435825, -47.625), (52.6591696039, -47.625))
            ThreePointArc((52.6591696039, -47.625), (51.6828142519, -49.786472114), (50.1394768867, -51.5874))
            Line((50.1394768867, -51.5874), (68.9981285423, -51.5874))
            ThreePointArc((68.9981285423, -51.5874), (67.4547911771, -49.786472114), (66.478435825, -47.625))
        make_face()
        with BuildLine():
            ThreePointArc((218.5043564002, 51.5874), (216.961019035, 49.786472114), (215.984663683, 47.625))
            Line((215.984663683, 47.625), (232.0666430334, 47.625))
            ThreePointArc((232.0666430334, 47.625), (231.0902876814, 49.786472114), (229.5469503162, 51.5874))
            Line((229.5469503162, 51.5874), (218.5043564002, 51.5874))
        make_face()
        with BuildLine():
            Line((232.0666430334, 47.625), (215.984663683, 47.625))
            ThreePointArc((215.984663683, 47.625), (224.0256533582, 36.9220438028), (232.0666430334, 47.625))
        make_face()
        with BuildLine():
            ThreePointArc((82.5604151755, -47.625), (74.5194255003, -36.9220438028), (66.478435825, -47.625))
            Line((66.478435825, -47.625), (82.5604151755, -47.625))
        make_face()
        with BuildLine():
            Line((82.5604151755, -47.625), (66.478435825, -47.625))
            ThreePointArc((66.478435825, -47.625), (67.4547911771, -49.786472114), (68.9981285423, -51.5874))
            Line((68.9981285423, -51.5874), (80.0407224583, -51.5874))
            ThreePointArc((80.0407224583, -51.5874), (81.5840598235, -49.786472114), (82.5604151755, -47.625))
        make_face()
        with BuildLine():
            ThreePointArc((229.5469503162, 51.5874), (231.0902876814, 49.786472114), (232.0666430334, 47.625))
            Line((232.0666430334, 47.625), (245.8859092545, 47.625))
            ThreePointArc((245.8859092545, 47.625), (246.8622646066, 49.786472114), (248.4056019718, 51.5874))
            Line((248.4056019718, 51.5874), (229.5469503162, 51.5874))
        make_face()
        with BuildLine():
            Line((96.3796813966, -47.625), (82.5604151755, -47.625))
            ThreePointArc((82.5604151755, -47.625), (81.5840598235, -49.786472114), (80.0407224583, -51.5874))
            Line((80.0407224583, -51.5874), (98.8993741139, -51.5874))
            ThreePointArc((98.8993741139, -51.5874), (97.3560367487, -49.786472114), (96.3796813966, -47.625))
        make_face()
        with BuildLine():
            ThreePointArc((248.4056019718, 51.5874), (246.8622646066, 49.786472114), (245.8859092545, 47.625))
            Line((245.8859092545, 47.625), (261.967888605, 47.625))
            ThreePointArc((261.967888605, 47.625), (260.991533253, 49.786472114), (259.4481958878, 51.5874))
            Line((259.4481958878, 51.5874), (248.4056019718, 51.5874))
        make_face()
        with BuildLine():
            Line((261.967888605, 47.625), (245.8859092545, 47.625))
            ThreePointArc((245.8859092545, 47.625), (253.9268989298, 36.9220438028), (261.967888605, 47.625))
        make_face()
        with BuildLine():
            ThreePointArc((112.4616607471, -47.625), (104.4206710719, -36.9220438028), (96.3796813966, -47.625))
            Line((96.3796813966, -47.625), (112.4616607471, -47.625))
        make_face()
        with BuildLine():
            Line((112.4616607471, -47.625), (96.3796813966, -47.625))
            ThreePointArc((96.3796813966, -47.625), (97.3560367487, -49.786472114), (98.8993741139, -51.5874))
            Line((98.8993741139, -51.5874), (109.9419680298, -51.5874))
            ThreePointArc((109.9419680298, -51.5874), (111.485305395, -49.786472114), (112.4616607471, -47.625))
        make_face()
        with BuildLine():
            ThreePointArc((259.4481958878, 51.5874), (260.991533253, 49.786472114), (261.967888605, 47.625))
            Line((261.967888605, 47.625), (268.6438332869, 47.625))
            ThreePointArc((268.6438332869, 47.625), (271.930715732, 47.5114410305), (275.2019234272, 47.171305671))
            ThreePointArc((275.2019234272, 47.171305671), (275.9297691982, 49.1503637276), (277.1290239498, 50.8847853309))
            ThreePointArc((277.1290239498, 50.8847853309), (272.900948741, 51.4114462622), (268.6438332869, 51.5874))
            Line((268.6438332869, 51.5874), (259.4481958878, 51.5874))
        make_face()
        with BuildLine():
            Line((126.2809269682, -47.625), (112.4616607471, -47.625))
            ThreePointArc((112.4616607471, -47.625), (111.485305395, -49.786472114), (109.9419680298, -51.5874))
            Line((109.9419680298, -51.5874), (128.8006196855, -51.5874))
            ThreePointArc((128.8006196855, -51.5874), (127.2572823202, -49.786472114), (126.2809269682, -47.625))
        make_face()
        with BuildLine():
            ThreePointArc((142.3629063187, -47.625), (134.3219166434, -36.9220438028), (126.2809269682, -47.625))
            Line((126.2809269682, -47.625), (142.3629063187, -47.625))
        make_face()
        with BuildLine():
            Line((142.3629063187, -47.625), (126.2809269682, -47.625))
            ThreePointArc((126.2809269682, -47.625), (127.2572823202, -49.786472114), (128.8006196855, -51.5874))
            Line((128.8006196855, -51.5874), (139.8432136014, -51.5874))
            ThreePointArc((139.8432136014, -51.5874), (141.3865509666, -49.786472114), (142.3629063187, -47.625))
        make_face()
        with BuildLine():
            ThreePointArc((277.1290239498, 50.8847853309), (275.9297691982, 49.1503637276), (275.2019234272, 47.171305671))
            ThreePointArc((275.2019234272, 47.171305671), (283.360767644, 45.2940665886), (291.0648247175, 42.0171366024))
            ThreePointArc((291.0648247175, 42.0171366024), (291.6392462586, 44.0460452131), (291.6884962236, 46.1541260224))
            ThreePointArc((291.6884962236, 46.1541260224), (284.5852165825, 49.0625329287), (277.1290239498, 50.8847853309))
        make_face()
        with BuildLine():
            ThreePointArc((291.0648247175, 42.0171366024), (283.360767644, 45.2940665886), (275.2019234272, 47.171305671))
            ThreePointArc((275.2019234272, 47.171305671), (280.7736703259, 37.3317997636), (291.0648247175, 42.0171366024))
        make_face()
        with BuildLine():
            Line((156.1821725398, -47.625), (142.3629063187, -47.625))
            ThreePointArc((142.3629063187, -47.625), (141.3865509666, -49.786472114), (139.8432136014, -51.5874))
            Line((139.8432136014, -51.5874), (158.701865257, -51.5874))
            ThreePointArc((158.701865257, -51.5874), (157.1585278918, -49.786472114), (156.1821725398, -47.625))
        make_face()
        with BuildLine():
            ThreePointArc((291.6884962236, 46.1541260224), (291.6392462586, 44.0460452131), (291.0648247175, 42.0171366024))
            ThreePointArc((291.0648247175, 42.0171366024), (296.6371059273, 38.5294343571), (301.6760374659, 34.307639267))
            ThreePointArc((301.6760374659, 34.307639267), (303.4281382029, 35.4809138575), (305.4178231173, 36.1791861533))
            ThreePointArc((305.4178231173, 36.1791861533), (298.966146211, 41.7350832956), (291.6884962236, 46.1541260224))
        make_face()
        with BuildLine():
            ThreePointArc((172.2641518903, -47.625), (164.223162215, -36.9220438028), (156.1821725398, -47.625))
            Line((156.1821725398, -47.625), (172.2641518903, -47.625))
        make_face()
        with BuildLine():
            Line((172.2641518903, -47.625), (156.1821725398, -47.625))
            ThreePointArc((156.1821725398, -47.625), (157.1585278918, -49.786472114), (158.701865257, -51.5874))
            Line((158.701865257, -51.5874), (169.744459173, -51.5874))
            ThreePointArc((169.744459173, -51.5874), (171.2877965382, -49.786472114), (172.2641518903, -47.625))
        make_face()
        with BuildLine():
            ThreePointArc((305.4178231173, 36.1791861533), (303.4281382029, 35.4809138575), (301.6760374659, 34.307639267))
            ThreePointArc((301.6760374659, 34.307639267), (307.173267644, 27.9932726404), (311.4798496235, 20.8138494617))
            ThreePointArc((311.4798496235, 20.8138494617), (313.1371289717, 22.1176344973), (314.4160718408, 23.7941592944))
            ThreePointArc((314.4160718408, 23.7941592944), (310.3789165825, 30.3223129241), (305.4178231173, 36.1791861533))
        make_face()
        with BuildLine():
            ThreePointArc((311.4798496235, 20.8138494617), (307.173267644, 27.9932726404), (301.6760374659, 34.307639267))
            ThreePointArc((301.6760374659, 34.307639267), (300.400158933, 23.0723211151), (311.4798496235, 20.8138494617))
        make_face()
        with BuildLine():
            Line((186.0834181114, -47.625), (172.2641518903, -47.625))
            ThreePointArc((172.2641518903, -47.625), (171.2877965382, -49.786472114), (169.744459173, -51.5874))
            Line((169.744459173, -51.5874), (188.6031108286, -51.5874))
            ThreePointArc((188.6031108286, -51.5874), (187.0597734634, -49.786472114), (186.0834181114, -47.625))
        make_face()
        with BuildLine():
            ThreePointArc((314.4160718408, 23.7941592944), (313.1371289717, 22.1176344973), (311.4798496235, 20.8138494617))
            ThreePointArc((311.4798496235, 20.8138494617), (313.9378998754, 14.7169343571), (315.5329722315, 8.3396207368))
            ThreePointArc((315.5329722315, 8.3396207368), (317.6400850048, 8.2589608458), (319.6602080715, 7.6543675504))
            ThreePointArc((319.6602080715, 7.6543675504), (317.7063662156, 15.9413832956), (314.4160718408, 23.7941592944))
        make_face()
        with BuildLine():
            ThreePointArc((202.1653974618, -47.625), (194.1244077866, -36.9220438028), (186.0834181114, -47.625))
            Line((186.0834181114, -47.625), (202.1653974618, -47.625))
        make_face()
        with BuildLine():
            Line((202.1653974618, -47.625), (186.0834181114, -47.625))
            ThreePointArc((186.0834181114, -47.625), (187.0597734634, -49.786472114), (188.6031108286, -51.5874))
            Line((188.6031108286, -51.5874), (199.6457047446, -51.5874))
            ThreePointArc((199.6457047446, -51.5874), (201.1890421098, -49.786472114), (202.1653974618, -47.625))
        make_face()
        with BuildLine():
            ThreePointArc((319.6602080715, 7.6543675504), (317.6400850048, 8.2589608458), (315.5329722315, 8.3396207368))
            ThreePointArc((315.5329722315, 8.3396207368), (316.2688332869, 0), (315.5329722315, -8.3396207368))
            ThreePointArc((315.5329722315, -8.3396207368), (317.6400850048, -8.2589608458), (319.6602080715, -7.6543675504))
            ThreePointArc((319.6602080715, -7.6543675504), (320.2312332869, 0), (319.6602080715, 7.6543675504))
        make_face()
        with BuildLine():
            ThreePointArc((315.5329722315, -8.3396207368), (316.2688332869, 0), (315.5329722315, 8.3396207368))
            ThreePointArc((315.5329722315, 8.3396207368), (307.8968105011, 0), (315.5329722315, -8.3396207368))
        make_face()
        with BuildLine():
            Line((215.984663683, -47.625), (202.1653974618, -47.625))
            ThreePointArc((202.1653974618, -47.625), (201.1890421098, -49.786472114), (199.6457047446, -51.5874))
            Line((199.6457047446, -51.5874), (218.5043564002, -51.5874))
            ThreePointArc((218.5043564002, -51.5874), (216.961019035, -49.786472114), (215.984663683, -47.625))
        make_face()
        with BuildLine():
            ThreePointArc((319.6602080715, -7.6543675504), (317.6400850048, -8.2589608458), (315.5329722315, -8.3396207368))
            ThreePointArc((315.5329722315, -8.3396207368), (313.9378998754, -14.7169343571), (311.4798496235, -20.8138494617))
            ThreePointArc((311.4798496235, -20.8138494617), (313.1371289717, -22.1176344973), (314.4160718408, -23.7941592944))
            ThreePointArc((314.4160718408, -23.7941592944), (317.7063662156, -15.9413832956), (319.6602080715, -7.6543675504))
        make_face()
        with BuildLine():
            ThreePointArc((232.0666430334, -47.625), (224.0256533582, -36.9220438028), (215.984663683, -47.625))
            Line((215.984663683, -47.625), (232.0666430334, -47.625))
        make_face()
        with BuildLine():
            Line((232.0666430334, -47.625), (215.984663683, -47.625))
            ThreePointArc((215.984663683, -47.625), (216.961019035, -49.786472114), (218.5043564002, -51.5874))
            Line((218.5043564002, -51.5874), (229.5469503162, -51.5874))
            ThreePointArc((229.5469503162, -51.5874), (231.0902876814, -49.786472114), (232.0666430334, -47.625))
        make_face()
        with BuildLine():
            ThreePointArc((314.4160718408, -23.7941592944), (313.1371289717, -22.1176344973), (311.4798496235, -20.8138494617))
            ThreePointArc((311.4798496235, -20.8138494617), (307.173267644, -27.9932726404), (301.6760374659, -34.307639267))
            ThreePointArc((301.6760374659, -34.307639267), (303.4281382029, -35.4809138575), (305.4178231173, -36.1791861533))
            ThreePointArc((305.4178231173, -36.1791861533), (310.3789165825, -30.3223129241), (314.4160718408, -23.7941592944))
        make_face()
        with BuildLine():
            ThreePointArc((301.6760374659, -34.307639267), (307.173267644, -27.9932726404), (311.4798496235, -20.8138494617))
            ThreePointArc((311.4798496235, -20.8138494617), (300.400158933, -23.0723211151), (301.6760374659, -34.307639267))
        make_face()
        with BuildLine():
            Line((245.8859092545, -47.625), (232.0666430334, -47.625))
            ThreePointArc((232.0666430334, -47.625), (231.0902876814, -49.786472114), (229.5469503162, -51.5874))
            Line((229.5469503162, -51.5874), (248.4056019718, -51.5874))
            ThreePointArc((248.4056019718, -51.5874), (246.8622646066, -49.786472114), (245.8859092545, -47.625))
        make_face()
        with BuildLine():
            ThreePointArc((305.4178231173, -36.1791861533), (303.4281382029, -35.4809138575), (301.6760374659, -34.307639267))
            ThreePointArc((301.6760374659, -34.307639267), (296.6371059273, -38.5294343571), (291.0648247175, -42.0171366024))
            ThreePointArc((291.0648247175, -42.0171366024), (283.360767644, -45.2940665886), (275.2019234272, -47.171305671))
            ThreePointArc((275.2019234272, -47.171305671), (275.9297691982, -49.1503637276), (277.1290239498, -50.8847853309))
            ThreePointArc((277.1290239498, -50.8847853309), (292.4379925813, -45.7722385539), (305.4178231173, -36.1791861533))
        make_face()
        with BuildLine():
            ThreePointArc((261.967888605, -47.625), (253.9268989298, -36.9220438028), (245.8859092545, -47.625))
            Line((245.8859092545, -47.625), (261.967888605, -47.625))
        make_face()
        with BuildLine():
            Line((261.967888605, -47.625), (245.8859092545, -47.625))
            ThreePointArc((245.8859092545, -47.625), (246.8622646066, -49.786472114), (248.4056019718, -51.5874))
            Line((248.4056019718, -51.5874), (259.4481958878, -51.5874))
            ThreePointArc((259.4481958878, -51.5874), (260.991533253, -49.786472114), (261.967888605, -47.625))
        make_face()
        with BuildLine():
            ThreePointArc((275.2019234272, -47.171305671), (283.360767644, -45.2940665886), (291.0648247175, -42.0171366024))
            ThreePointArc((291.0648247175, -42.0171366024), (280.7736703259, -37.3317997636), (275.2019234272, -47.171305671))
        make_face()
        with BuildLine():
            ThreePointArc((268.6438332869, -51.5874), (272.900948741, -51.4114462622), (277.1290239498, -50.8847853309))
            ThreePointArc((277.1290239498, -50.8847853309), (275.9297691982, -49.1503637276), (275.2019234272, -47.171305671))
            ThreePointArc((275.2019234272, -47.171305671), (271.930715732, -47.5114410305), (268.6438332869, -47.625))
            Line((268.6438332869, -47.625), (261.967888605, -47.625))
            ThreePointArc((261.967888605, -47.625), (260.991533253, -49.786472114), (259.4481958878, -51.5874))
            Line((259.4481958878, -51.5874), (268.6438332869, -51.5874))
        make_face()
    extrude(amount=F3_DEPTH)


solid = f3.part
